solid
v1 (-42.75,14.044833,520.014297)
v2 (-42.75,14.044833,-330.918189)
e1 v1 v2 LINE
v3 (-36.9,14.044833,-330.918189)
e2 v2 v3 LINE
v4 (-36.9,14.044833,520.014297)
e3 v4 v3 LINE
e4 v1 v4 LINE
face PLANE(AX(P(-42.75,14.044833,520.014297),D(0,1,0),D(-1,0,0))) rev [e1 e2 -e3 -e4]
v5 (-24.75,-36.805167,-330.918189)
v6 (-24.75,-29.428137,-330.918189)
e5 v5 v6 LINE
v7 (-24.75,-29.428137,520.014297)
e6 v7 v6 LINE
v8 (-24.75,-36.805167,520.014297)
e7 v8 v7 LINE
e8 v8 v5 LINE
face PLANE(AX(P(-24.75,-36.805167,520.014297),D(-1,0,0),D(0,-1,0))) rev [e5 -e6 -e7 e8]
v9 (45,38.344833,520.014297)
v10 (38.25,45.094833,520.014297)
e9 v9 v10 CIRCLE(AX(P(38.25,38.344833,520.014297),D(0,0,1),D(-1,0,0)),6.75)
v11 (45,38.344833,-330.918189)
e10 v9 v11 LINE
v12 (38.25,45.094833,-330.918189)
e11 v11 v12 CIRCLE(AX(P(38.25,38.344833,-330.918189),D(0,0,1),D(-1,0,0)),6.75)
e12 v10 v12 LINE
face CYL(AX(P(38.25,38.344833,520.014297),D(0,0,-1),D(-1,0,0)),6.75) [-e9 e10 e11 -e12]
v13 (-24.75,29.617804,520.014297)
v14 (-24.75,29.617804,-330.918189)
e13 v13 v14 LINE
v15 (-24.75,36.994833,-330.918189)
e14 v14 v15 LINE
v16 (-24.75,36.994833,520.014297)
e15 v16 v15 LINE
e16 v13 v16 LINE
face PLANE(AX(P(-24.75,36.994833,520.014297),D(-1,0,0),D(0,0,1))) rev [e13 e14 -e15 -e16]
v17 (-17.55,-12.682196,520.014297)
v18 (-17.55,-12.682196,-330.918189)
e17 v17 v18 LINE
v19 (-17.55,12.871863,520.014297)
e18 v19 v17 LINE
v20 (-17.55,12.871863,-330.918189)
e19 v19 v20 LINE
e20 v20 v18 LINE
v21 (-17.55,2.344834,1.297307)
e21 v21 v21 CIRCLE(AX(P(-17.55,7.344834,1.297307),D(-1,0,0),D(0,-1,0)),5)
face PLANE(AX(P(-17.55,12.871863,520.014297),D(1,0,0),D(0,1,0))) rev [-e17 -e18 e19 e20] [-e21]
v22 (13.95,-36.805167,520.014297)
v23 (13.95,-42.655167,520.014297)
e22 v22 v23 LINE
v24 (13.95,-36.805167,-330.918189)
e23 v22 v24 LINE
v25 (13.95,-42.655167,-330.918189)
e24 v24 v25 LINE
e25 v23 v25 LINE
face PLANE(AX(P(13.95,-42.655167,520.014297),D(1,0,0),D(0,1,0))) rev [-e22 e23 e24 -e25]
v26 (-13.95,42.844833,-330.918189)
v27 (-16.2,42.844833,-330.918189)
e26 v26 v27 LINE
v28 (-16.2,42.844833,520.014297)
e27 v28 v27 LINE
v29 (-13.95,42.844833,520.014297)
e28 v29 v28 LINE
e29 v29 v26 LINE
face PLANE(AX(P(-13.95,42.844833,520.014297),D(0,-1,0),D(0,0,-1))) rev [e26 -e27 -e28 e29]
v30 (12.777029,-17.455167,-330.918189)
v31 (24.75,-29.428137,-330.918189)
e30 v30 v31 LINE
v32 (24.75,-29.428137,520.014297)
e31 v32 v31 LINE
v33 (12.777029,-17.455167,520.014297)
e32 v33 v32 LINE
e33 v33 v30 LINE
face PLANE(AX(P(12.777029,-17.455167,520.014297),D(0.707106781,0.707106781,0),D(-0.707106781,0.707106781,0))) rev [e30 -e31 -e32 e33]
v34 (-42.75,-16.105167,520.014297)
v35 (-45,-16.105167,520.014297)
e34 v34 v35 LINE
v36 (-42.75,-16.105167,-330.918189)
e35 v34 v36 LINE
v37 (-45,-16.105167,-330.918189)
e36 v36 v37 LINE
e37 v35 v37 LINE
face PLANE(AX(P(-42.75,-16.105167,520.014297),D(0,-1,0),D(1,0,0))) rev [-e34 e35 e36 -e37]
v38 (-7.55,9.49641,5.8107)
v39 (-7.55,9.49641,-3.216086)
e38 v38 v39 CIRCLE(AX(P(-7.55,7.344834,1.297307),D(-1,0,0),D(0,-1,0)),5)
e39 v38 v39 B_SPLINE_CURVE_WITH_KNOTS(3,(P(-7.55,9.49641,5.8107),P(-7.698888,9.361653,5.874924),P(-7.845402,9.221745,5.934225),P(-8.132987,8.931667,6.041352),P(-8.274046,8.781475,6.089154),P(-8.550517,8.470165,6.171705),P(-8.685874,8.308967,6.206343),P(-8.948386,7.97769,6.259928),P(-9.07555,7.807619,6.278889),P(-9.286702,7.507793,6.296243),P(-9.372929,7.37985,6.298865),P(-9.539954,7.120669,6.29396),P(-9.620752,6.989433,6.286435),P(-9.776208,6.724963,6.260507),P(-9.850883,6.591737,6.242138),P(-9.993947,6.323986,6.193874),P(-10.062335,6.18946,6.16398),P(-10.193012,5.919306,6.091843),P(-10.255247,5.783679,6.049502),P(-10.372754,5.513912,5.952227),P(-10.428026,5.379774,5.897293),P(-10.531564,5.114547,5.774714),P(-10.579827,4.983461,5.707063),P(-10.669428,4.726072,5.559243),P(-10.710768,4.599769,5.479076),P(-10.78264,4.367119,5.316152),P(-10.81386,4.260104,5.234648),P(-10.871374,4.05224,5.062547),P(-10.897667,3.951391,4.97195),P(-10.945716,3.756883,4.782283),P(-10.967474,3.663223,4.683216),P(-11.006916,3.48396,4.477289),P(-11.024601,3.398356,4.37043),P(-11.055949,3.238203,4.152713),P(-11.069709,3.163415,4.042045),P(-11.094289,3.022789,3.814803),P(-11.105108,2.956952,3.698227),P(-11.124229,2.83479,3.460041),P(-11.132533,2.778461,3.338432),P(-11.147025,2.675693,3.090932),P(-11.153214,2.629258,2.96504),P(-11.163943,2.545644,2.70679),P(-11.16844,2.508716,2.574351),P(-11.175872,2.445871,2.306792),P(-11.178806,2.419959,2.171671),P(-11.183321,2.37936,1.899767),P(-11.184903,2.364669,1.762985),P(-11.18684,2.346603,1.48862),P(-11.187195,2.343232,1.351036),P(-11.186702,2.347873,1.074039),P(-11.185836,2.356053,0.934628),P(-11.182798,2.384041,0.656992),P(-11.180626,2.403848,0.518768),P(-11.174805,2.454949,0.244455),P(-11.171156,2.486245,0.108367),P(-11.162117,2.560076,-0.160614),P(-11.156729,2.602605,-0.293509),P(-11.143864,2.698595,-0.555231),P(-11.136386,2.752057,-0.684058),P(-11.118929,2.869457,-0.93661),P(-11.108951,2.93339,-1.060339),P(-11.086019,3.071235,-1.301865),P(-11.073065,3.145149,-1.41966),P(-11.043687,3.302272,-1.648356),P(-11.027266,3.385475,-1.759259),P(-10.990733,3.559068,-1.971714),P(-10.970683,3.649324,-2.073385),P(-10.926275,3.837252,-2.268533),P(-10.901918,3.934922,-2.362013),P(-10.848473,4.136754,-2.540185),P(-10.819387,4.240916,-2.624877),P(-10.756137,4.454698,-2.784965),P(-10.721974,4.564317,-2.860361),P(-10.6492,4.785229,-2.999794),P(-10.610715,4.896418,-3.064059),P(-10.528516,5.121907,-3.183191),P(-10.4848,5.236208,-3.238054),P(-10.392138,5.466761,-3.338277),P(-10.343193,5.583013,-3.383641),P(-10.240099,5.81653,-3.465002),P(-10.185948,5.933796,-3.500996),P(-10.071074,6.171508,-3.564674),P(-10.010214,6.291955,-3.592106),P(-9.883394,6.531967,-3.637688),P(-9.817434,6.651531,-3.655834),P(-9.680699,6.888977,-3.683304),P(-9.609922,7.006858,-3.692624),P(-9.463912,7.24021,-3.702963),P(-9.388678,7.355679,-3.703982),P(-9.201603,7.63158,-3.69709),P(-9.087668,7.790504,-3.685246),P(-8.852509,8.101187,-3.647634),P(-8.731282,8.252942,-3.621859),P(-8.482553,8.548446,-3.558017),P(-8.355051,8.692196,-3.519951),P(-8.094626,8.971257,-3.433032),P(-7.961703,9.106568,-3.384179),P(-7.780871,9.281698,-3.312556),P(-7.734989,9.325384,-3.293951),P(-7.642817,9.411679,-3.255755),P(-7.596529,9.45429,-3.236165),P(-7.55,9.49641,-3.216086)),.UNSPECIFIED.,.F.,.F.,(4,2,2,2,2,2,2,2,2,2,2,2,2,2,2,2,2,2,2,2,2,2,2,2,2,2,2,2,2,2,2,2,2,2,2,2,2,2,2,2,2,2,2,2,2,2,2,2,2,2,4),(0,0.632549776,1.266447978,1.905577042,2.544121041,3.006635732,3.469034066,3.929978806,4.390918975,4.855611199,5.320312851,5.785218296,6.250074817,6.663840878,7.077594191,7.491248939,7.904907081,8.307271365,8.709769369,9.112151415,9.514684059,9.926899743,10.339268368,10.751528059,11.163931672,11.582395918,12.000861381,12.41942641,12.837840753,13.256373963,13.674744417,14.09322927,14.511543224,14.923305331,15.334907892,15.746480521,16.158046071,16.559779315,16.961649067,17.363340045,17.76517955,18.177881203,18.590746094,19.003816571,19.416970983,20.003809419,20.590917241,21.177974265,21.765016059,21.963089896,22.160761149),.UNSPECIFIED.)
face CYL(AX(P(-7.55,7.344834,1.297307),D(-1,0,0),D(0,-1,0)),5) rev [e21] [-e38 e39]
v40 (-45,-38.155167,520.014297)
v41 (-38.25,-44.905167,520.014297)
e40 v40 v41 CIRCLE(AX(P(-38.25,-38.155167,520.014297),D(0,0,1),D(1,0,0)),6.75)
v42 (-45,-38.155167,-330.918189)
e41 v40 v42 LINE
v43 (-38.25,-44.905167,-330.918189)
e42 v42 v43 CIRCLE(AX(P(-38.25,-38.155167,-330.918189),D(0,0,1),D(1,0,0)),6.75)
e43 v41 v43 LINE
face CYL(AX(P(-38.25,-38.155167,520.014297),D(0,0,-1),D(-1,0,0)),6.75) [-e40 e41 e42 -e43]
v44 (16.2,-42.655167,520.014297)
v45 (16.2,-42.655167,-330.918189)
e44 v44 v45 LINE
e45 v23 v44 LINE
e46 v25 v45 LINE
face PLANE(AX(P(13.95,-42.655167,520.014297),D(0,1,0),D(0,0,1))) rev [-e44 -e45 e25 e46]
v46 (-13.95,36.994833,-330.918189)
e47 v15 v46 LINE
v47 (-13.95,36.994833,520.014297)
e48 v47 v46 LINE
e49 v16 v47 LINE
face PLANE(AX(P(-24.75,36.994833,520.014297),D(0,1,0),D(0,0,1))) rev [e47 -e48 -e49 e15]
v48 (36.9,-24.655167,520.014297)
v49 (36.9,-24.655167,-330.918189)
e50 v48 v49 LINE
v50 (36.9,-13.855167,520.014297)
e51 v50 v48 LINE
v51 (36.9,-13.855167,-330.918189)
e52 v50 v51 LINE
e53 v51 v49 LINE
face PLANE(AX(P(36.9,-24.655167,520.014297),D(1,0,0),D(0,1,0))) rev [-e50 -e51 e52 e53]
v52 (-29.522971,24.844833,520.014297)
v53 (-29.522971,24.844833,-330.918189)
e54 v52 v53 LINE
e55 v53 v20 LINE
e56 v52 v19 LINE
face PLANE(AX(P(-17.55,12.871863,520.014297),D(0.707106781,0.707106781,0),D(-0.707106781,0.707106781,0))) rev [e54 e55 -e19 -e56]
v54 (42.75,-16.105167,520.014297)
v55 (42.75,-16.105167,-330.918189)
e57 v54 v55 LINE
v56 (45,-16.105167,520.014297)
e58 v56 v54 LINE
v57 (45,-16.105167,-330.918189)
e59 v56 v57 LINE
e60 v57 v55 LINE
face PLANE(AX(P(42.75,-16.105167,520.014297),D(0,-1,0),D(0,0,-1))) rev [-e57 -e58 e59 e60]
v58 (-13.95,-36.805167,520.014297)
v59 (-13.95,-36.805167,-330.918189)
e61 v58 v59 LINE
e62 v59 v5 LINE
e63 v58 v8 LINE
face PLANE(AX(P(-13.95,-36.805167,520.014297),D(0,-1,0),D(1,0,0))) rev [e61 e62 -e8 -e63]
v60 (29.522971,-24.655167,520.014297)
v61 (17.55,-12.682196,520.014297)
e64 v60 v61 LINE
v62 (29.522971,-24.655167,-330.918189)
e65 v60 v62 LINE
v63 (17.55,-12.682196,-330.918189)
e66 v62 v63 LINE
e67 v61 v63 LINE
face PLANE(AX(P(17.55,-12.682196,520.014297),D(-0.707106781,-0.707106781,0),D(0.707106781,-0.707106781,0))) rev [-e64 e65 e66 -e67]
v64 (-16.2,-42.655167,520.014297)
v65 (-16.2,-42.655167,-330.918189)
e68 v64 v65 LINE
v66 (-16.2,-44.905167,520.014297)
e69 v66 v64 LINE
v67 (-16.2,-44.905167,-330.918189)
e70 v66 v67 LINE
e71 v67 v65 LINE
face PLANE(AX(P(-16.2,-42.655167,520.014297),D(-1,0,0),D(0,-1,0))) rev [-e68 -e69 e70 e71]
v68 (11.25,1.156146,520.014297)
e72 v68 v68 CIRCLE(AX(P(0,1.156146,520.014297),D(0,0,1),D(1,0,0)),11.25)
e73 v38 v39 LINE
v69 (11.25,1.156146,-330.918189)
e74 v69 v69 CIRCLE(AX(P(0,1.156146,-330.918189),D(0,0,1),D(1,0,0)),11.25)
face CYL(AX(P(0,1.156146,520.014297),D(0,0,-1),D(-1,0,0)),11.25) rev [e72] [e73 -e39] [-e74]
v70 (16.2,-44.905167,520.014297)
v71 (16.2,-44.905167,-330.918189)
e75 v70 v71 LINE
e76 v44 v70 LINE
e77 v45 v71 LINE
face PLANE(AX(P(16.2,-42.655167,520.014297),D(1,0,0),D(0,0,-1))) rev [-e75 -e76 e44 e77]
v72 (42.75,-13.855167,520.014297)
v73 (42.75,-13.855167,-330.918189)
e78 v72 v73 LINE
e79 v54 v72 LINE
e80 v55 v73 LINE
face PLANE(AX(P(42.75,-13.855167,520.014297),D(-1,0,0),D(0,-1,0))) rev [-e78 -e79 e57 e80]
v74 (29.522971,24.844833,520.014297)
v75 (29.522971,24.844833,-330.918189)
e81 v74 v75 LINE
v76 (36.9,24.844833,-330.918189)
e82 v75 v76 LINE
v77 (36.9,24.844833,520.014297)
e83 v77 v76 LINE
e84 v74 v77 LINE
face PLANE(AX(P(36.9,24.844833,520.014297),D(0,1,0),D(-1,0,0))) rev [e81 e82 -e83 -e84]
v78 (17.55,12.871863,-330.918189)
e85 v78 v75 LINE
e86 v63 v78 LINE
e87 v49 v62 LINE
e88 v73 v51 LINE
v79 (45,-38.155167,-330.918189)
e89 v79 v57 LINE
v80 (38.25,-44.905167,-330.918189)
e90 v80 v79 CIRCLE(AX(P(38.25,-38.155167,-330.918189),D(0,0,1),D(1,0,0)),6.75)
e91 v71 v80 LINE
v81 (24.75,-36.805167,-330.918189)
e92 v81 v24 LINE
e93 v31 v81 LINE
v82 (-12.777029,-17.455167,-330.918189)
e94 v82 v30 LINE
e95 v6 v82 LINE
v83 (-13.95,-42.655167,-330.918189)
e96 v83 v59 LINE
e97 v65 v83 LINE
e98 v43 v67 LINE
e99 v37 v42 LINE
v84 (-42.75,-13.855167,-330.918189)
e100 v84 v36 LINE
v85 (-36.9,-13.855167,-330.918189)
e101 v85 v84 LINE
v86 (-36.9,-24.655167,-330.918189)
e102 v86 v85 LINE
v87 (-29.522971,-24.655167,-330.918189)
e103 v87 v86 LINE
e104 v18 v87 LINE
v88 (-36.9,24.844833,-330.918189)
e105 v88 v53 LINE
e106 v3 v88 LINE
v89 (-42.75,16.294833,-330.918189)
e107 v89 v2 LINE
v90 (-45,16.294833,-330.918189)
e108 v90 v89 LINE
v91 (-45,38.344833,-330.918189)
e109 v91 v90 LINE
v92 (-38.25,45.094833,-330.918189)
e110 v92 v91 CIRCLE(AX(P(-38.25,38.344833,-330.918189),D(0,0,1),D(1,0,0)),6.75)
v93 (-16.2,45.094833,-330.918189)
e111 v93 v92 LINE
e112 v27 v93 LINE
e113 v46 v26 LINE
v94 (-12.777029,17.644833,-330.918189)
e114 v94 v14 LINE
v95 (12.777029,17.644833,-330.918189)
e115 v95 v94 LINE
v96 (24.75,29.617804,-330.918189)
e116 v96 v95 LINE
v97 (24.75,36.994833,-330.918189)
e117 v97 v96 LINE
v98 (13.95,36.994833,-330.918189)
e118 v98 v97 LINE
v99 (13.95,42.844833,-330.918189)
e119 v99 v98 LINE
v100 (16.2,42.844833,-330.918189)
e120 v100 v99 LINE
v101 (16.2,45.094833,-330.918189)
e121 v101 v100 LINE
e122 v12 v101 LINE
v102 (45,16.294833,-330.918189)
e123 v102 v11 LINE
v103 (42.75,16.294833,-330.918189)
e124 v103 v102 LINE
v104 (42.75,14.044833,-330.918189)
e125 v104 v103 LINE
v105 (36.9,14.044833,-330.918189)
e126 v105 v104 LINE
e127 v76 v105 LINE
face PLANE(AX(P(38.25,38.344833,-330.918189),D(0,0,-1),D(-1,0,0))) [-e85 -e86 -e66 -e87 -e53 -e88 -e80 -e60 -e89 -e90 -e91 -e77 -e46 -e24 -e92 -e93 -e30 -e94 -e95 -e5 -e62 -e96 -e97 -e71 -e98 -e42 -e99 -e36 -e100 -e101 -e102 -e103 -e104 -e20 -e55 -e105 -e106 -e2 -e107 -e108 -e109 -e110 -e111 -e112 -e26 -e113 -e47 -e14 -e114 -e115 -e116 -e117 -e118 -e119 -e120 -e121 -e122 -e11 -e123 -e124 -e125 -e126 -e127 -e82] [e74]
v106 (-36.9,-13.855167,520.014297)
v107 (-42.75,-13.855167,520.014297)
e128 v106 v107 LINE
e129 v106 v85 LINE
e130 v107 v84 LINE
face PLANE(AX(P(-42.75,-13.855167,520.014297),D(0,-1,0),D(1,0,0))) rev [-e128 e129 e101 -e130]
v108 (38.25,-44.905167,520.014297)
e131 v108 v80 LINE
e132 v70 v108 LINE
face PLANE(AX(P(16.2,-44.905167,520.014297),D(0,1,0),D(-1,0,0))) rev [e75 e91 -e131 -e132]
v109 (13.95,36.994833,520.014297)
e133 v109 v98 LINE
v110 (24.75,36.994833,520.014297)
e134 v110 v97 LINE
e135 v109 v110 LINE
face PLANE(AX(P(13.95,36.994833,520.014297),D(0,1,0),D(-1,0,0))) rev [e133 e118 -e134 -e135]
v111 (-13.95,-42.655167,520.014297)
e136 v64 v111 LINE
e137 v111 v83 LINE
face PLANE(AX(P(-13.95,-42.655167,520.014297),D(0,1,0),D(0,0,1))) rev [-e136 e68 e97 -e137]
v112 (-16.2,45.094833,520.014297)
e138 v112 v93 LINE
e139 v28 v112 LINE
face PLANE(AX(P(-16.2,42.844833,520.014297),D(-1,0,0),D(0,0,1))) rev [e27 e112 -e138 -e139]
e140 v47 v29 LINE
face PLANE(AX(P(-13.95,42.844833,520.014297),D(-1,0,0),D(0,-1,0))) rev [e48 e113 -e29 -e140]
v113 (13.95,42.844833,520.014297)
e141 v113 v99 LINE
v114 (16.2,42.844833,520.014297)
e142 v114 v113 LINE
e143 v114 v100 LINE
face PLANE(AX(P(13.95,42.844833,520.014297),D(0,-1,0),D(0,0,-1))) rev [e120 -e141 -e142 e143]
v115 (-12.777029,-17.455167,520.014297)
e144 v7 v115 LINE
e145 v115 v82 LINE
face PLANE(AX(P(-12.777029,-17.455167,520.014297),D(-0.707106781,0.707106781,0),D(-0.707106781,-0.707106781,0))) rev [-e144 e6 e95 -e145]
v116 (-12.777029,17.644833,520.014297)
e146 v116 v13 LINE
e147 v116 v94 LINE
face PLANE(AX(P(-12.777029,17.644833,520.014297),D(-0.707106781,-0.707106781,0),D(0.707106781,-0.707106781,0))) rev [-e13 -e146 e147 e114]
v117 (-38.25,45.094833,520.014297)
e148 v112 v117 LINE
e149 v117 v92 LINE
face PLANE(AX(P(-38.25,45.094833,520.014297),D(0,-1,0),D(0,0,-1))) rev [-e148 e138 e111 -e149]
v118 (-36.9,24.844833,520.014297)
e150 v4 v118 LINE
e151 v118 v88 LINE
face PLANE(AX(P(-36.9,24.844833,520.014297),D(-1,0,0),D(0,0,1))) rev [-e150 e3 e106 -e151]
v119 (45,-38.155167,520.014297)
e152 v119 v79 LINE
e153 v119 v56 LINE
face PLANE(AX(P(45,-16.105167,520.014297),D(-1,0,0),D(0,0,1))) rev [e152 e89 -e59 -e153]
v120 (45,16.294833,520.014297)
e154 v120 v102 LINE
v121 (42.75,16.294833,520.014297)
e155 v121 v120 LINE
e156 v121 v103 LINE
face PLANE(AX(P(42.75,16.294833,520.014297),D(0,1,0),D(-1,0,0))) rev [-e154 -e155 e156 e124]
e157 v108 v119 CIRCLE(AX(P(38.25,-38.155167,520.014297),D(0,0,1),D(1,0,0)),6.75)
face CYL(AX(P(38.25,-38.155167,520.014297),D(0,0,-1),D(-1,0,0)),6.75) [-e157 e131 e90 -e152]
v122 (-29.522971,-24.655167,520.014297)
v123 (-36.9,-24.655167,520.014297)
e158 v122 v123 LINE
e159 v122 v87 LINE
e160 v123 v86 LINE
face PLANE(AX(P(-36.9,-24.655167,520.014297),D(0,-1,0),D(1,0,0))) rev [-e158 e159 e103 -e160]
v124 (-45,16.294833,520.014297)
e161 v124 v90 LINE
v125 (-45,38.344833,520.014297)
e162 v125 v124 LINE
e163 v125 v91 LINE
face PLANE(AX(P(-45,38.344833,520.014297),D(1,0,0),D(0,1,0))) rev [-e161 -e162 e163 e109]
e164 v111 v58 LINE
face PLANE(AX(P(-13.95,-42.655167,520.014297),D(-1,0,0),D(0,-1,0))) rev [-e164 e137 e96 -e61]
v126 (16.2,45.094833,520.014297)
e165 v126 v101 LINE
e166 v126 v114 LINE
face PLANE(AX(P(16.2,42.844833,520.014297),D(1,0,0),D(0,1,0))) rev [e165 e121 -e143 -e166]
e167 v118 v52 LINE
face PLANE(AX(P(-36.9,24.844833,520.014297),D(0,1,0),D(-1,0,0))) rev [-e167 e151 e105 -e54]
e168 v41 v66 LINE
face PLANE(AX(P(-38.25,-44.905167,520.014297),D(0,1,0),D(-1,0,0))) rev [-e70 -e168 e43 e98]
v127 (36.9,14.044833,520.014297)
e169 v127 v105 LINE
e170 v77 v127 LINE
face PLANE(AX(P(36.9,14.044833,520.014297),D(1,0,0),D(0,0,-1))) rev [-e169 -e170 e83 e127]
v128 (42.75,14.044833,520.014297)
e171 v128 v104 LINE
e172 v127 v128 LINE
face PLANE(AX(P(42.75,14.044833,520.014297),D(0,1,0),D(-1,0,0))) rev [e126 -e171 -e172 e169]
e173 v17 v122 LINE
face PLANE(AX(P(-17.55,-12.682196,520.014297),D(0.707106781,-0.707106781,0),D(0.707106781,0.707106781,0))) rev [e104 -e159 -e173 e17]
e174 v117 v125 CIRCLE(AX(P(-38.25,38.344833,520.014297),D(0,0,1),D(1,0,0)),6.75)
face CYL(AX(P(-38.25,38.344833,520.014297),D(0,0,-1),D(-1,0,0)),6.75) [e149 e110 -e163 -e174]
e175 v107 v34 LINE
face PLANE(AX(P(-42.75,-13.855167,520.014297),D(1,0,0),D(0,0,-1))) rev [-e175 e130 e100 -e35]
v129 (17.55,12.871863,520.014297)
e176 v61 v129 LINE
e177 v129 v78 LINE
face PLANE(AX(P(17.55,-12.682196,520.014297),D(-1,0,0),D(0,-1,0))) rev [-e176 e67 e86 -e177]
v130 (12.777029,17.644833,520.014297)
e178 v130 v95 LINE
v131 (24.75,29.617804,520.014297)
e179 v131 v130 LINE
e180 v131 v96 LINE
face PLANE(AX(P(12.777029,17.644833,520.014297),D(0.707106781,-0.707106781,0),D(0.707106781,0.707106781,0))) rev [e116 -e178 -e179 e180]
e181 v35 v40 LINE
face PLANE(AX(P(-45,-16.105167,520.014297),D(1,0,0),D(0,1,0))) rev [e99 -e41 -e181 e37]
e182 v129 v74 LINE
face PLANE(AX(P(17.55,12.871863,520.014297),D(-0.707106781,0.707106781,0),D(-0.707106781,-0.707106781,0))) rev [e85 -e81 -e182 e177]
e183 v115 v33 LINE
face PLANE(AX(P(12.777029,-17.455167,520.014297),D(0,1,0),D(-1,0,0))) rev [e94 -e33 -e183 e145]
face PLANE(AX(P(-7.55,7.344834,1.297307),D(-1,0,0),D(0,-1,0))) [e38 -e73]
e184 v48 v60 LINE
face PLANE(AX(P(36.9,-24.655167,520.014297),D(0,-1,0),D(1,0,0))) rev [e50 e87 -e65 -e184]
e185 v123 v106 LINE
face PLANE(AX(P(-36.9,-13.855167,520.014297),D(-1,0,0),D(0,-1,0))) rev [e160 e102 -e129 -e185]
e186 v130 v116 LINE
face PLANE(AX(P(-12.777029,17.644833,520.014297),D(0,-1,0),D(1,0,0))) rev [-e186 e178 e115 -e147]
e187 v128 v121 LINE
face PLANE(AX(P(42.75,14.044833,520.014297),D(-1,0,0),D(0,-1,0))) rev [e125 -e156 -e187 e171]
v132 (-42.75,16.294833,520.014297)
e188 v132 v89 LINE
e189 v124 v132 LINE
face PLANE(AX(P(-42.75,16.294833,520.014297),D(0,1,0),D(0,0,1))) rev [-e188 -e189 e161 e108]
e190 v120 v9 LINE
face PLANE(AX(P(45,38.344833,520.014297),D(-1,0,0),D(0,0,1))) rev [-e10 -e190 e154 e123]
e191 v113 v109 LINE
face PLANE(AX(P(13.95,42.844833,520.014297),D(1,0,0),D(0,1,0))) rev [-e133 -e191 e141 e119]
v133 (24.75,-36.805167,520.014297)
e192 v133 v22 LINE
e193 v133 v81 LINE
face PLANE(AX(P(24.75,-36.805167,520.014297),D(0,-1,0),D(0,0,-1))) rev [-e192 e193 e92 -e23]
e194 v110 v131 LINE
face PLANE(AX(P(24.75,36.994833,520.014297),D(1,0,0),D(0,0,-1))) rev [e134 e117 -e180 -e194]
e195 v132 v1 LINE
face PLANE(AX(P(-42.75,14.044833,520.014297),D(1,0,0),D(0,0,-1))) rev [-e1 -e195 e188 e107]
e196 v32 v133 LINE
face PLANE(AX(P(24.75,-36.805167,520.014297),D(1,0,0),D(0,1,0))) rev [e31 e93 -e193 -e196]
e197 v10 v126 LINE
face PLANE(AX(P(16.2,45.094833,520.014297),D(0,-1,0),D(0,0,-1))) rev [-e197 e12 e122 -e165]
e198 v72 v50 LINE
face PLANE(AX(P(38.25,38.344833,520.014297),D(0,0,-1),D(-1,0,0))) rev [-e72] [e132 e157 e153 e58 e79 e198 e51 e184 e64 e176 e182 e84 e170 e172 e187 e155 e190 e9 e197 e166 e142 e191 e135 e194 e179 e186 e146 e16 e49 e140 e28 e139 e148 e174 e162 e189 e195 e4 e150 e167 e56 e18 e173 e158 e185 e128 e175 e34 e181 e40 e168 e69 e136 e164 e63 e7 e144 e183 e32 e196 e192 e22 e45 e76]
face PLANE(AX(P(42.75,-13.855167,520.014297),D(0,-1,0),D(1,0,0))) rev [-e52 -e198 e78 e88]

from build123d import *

# Parameters (mm, degrees)
SKETCH1_R           = 2.5
BOSS_EXTRUDE1_DEPTH = 189.096108091
SCALE_2_SCALE       = 3
SCALE_3_SCALE       = 6
SCALE_5_SCALE       = 2
SCALE_6_SCALE       = 0.25
SCALE_7_SCALE       = 0.125
SCALE_8_SCALE       = 0.25
SCALE_9_SCALE       = 4
SCALE_10_SCALE      = 4
OTHER_START         = -17.55
OTHER_1_OUTLINE_R   = 5
OTHER_1_DEPTH       = 10


# Read off the part's stored shape, not the designer's step: 孔1
with BuildPart() as part:
    # Sketch1 → Boss-Extrude1 (new body)
    with BuildSketch(Plane.XY):
        with BuildLine():
            Line((2.839339828, 3.9), (5.5, 6.560660172))
            Line((5.5, 6.560660172), (5.5, 8.2))
            Line((5.5, 8.2), (3.1, 8.2))
            Line((3.1, 8.2), (3.1, 9.5))
            Line((3.1, 9.5), (3.6, 9.5))
            Line((3.6, 9.5), (3.6, 10))
            Line((3.6, 10), (8.5, 10))
            ThreePointArc((8.5, 10), (9.560660172, 9.560660172), (10, 8.5))
            Line((10, 8.5), (10, 3.6))
            Line((10, 3.6), (9.5, 3.6))
            Line((9.5, 3.6), (9.5, 3.1))
            Line((9.5, 3.1), (8.2, 3.1))
            Line((8.2, 3.1), (8.2, 5.5))
            Line((8.2, 5.5), (6.560660172, 5.5))
            Line((6.560660172, 5.5), (3.9, 2.839339828))
            Line((3.9, 2.839339828), (3.9, -2.839339828))
            Line((3.9, -2.839339828), (6.560660172, -5.5))
            Line((6.560660172, -5.5), (8.2, -5.5))
            Line((8.2, -5.5), (8.2, -3.1))
            Line((8.2, -3.1), (9.5, -3.1))
            Line((9.5, -3.1), (9.5, -3.6))
            Line((9.5, -3.6), (10, -3.6))
            Line((10, -3.6), (10, -8.5))
            ThreePointArc((10, -8.5), (9.560660172, -9.560660172), (8.5, -10))
            Line((8.5, -10), (3.6, -10))
            Line((3.6, -10), (3.6, -9.5))
            Line((3.6, -9.5), (3.1, -9.5))
            Line((3.1, -9.5), (3.1, -8.2))
            Line((3.1, -8.2), (5.5, -8.2))
            Line((5.5, -8.2), (5.5, -6.560660172))
            Line((5.5, -6.560660172), (2.839339828, -3.9))
            Line((2.839339828, -3.9), (-2.839339828, -3.9))
            Line((-2.839339828, -3.9), (-5.5, -6.560660172))
            Line((-5.5, -6.560660172), (-5.5, -8.2))
            Line((-5.5, -8.2), (-3.1, -8.2))
            Line((-3.1, -8.2), (-3.1, -9.5))
            Line((-3.1, -9.5), (-3.6, -9.5))
            Line((-3.6, -9.5), (-3.6, -10))
            Line((-3.6, -10), (-8.5, -10))
            ThreePointArc((-8.5, -10), (-9.560660172, -9.560660172), (-10, -8.5))
            Line((-10, -8.5), (-10, -3.6))
            Line((-10, -3.6), (-9.5, -3.6))
            Line((-9.5, -3.6), (-9.5, -3.1))
            Line((-9.5, -3.1), (-8.2, -3.1))
            Line((-8.2, -3.1), (-8.2, -5.5))
            Line((-8.2, -5.5), (-6.560660172, -5.5))
            Line((-6.560660172, -5.5), (-3.9, -2.839339828))
            Line((-3.9, -2.839339828), (-3.9, 2.839339828))
            Line((-3.9, 2.839339828), (-6.560660172, 5.5))
            Line((-6.560660172, 5.5), (-8.2, 5.5))
            Line((-8.2, 5.5), (-8.2, 3.1))
            Line((-8.2, 3.1), (-9.5, 3.1))
            Line((-9.5, 3.1), (-9.5, 3.6))
            Line((-9.5, 3.6), (-10, 3.6))
            Line((-10, 3.6), (-10, 8.5))
            ThreePointArc((-10, 8.5), (-9.560660172, 9.560660172), (-8.5, 10))
            Line((-8.5, 10), (-3.6, 10))
            Line((-3.6, 10), (-3.6, 9.5))
            Line((-3.6, 9.5), (-3.1, 9.5))
            Line((-3.1, 9.5), (-3.1, 8.2))
            Line((-3.1, 8.2), (-5.5, 8.2))
            Line((-5.5, 8.2), (-5.5, 6.560660172))
            Line((-5.5, 6.560660172), (-2.839339828, 3.9))
            Line((-2.839339828, 3.9), (2.839339828, 3.9))
        make_face()
        with Locations((0, 0.235847297)):
            Circle(SKETCH1_R, mode=Mode.SUBTRACT)
    extrude(amount=BOSS_EXTRUDE1_DEPTH)


with BuildPart() as part_1:
    # 缩放比例2: scaled about (0, -0.027095247, 94.548054046)
    add(part.part.scale(SCALE_2_SCALE).moved(Location((0, 0.054190494, -189.096108092))))


with BuildPart() as part_2:
    # 缩放比例3: scaled about (0, -0.027095247, 94.548054045)
    add(part_1.part.scale(SCALE_3_SCALE).moved(Location((0, 0.135476235, -472.740270225))))


with BuildPart() as part_3:
    # 缩放比例5: scaled about (0, -0.027095249, 94.548054043)
    add(part_2.part.scale(SCALE_5_SCALE).moved(Location((0, 0.027095249, -94.548054043))))


with BuildPart() as part_4:
    # 缩放比例6: scaled about (0, -0.027095249, 94.548054044)
    add(part_3.part.scale(SCALE_6_SCALE).moved(Location((0, -0.020321437, 70.911040533))))


with BuildPart() as part_5:
    # 缩放比例7: scaled about (0, -0.027095249, 94.548054044)
    add(part_4.part.scale(SCALE_7_SCALE).moved(Location((0, -0.023708343, 82.729547289))))


with BuildPart() as part_6:
    # 缩放比例8: scaled about (0, -0.027095249, 94.548054044)
    add(part_5.part.scale(SCALE_8_SCALE).moved(Location((0, -0.020321437, 70.911040533))))


with BuildPart() as part_7:
    # 缩放比例9: scaled about (0, -0.027095249, 94.548054044)
    add(part_6.part.scale(SCALE_9_SCALE).moved(Location((0, 0.081285747, -283.644162132))))


with BuildPart() as part_8:
    # 缩放比例10: scaled about (0, -0.027095249, 94.548054044)
    add(part_7.part.scale(SCALE_10_SCALE).moved(Location((0, 0.081285747, -283.644162132))))

    # 孔1 outline → 孔1 (cut)
    with BuildSketch(Plane.YZ.offset(OTHER_START)):
        with Locations((7.344833538, 1.297306883)):
            Circle(OTHER_1_OUTLINE_R)
    extrude(amount=OTHER_1_DEPTH, mode=Mode.SUBTRACT)


solid = part_8.part
